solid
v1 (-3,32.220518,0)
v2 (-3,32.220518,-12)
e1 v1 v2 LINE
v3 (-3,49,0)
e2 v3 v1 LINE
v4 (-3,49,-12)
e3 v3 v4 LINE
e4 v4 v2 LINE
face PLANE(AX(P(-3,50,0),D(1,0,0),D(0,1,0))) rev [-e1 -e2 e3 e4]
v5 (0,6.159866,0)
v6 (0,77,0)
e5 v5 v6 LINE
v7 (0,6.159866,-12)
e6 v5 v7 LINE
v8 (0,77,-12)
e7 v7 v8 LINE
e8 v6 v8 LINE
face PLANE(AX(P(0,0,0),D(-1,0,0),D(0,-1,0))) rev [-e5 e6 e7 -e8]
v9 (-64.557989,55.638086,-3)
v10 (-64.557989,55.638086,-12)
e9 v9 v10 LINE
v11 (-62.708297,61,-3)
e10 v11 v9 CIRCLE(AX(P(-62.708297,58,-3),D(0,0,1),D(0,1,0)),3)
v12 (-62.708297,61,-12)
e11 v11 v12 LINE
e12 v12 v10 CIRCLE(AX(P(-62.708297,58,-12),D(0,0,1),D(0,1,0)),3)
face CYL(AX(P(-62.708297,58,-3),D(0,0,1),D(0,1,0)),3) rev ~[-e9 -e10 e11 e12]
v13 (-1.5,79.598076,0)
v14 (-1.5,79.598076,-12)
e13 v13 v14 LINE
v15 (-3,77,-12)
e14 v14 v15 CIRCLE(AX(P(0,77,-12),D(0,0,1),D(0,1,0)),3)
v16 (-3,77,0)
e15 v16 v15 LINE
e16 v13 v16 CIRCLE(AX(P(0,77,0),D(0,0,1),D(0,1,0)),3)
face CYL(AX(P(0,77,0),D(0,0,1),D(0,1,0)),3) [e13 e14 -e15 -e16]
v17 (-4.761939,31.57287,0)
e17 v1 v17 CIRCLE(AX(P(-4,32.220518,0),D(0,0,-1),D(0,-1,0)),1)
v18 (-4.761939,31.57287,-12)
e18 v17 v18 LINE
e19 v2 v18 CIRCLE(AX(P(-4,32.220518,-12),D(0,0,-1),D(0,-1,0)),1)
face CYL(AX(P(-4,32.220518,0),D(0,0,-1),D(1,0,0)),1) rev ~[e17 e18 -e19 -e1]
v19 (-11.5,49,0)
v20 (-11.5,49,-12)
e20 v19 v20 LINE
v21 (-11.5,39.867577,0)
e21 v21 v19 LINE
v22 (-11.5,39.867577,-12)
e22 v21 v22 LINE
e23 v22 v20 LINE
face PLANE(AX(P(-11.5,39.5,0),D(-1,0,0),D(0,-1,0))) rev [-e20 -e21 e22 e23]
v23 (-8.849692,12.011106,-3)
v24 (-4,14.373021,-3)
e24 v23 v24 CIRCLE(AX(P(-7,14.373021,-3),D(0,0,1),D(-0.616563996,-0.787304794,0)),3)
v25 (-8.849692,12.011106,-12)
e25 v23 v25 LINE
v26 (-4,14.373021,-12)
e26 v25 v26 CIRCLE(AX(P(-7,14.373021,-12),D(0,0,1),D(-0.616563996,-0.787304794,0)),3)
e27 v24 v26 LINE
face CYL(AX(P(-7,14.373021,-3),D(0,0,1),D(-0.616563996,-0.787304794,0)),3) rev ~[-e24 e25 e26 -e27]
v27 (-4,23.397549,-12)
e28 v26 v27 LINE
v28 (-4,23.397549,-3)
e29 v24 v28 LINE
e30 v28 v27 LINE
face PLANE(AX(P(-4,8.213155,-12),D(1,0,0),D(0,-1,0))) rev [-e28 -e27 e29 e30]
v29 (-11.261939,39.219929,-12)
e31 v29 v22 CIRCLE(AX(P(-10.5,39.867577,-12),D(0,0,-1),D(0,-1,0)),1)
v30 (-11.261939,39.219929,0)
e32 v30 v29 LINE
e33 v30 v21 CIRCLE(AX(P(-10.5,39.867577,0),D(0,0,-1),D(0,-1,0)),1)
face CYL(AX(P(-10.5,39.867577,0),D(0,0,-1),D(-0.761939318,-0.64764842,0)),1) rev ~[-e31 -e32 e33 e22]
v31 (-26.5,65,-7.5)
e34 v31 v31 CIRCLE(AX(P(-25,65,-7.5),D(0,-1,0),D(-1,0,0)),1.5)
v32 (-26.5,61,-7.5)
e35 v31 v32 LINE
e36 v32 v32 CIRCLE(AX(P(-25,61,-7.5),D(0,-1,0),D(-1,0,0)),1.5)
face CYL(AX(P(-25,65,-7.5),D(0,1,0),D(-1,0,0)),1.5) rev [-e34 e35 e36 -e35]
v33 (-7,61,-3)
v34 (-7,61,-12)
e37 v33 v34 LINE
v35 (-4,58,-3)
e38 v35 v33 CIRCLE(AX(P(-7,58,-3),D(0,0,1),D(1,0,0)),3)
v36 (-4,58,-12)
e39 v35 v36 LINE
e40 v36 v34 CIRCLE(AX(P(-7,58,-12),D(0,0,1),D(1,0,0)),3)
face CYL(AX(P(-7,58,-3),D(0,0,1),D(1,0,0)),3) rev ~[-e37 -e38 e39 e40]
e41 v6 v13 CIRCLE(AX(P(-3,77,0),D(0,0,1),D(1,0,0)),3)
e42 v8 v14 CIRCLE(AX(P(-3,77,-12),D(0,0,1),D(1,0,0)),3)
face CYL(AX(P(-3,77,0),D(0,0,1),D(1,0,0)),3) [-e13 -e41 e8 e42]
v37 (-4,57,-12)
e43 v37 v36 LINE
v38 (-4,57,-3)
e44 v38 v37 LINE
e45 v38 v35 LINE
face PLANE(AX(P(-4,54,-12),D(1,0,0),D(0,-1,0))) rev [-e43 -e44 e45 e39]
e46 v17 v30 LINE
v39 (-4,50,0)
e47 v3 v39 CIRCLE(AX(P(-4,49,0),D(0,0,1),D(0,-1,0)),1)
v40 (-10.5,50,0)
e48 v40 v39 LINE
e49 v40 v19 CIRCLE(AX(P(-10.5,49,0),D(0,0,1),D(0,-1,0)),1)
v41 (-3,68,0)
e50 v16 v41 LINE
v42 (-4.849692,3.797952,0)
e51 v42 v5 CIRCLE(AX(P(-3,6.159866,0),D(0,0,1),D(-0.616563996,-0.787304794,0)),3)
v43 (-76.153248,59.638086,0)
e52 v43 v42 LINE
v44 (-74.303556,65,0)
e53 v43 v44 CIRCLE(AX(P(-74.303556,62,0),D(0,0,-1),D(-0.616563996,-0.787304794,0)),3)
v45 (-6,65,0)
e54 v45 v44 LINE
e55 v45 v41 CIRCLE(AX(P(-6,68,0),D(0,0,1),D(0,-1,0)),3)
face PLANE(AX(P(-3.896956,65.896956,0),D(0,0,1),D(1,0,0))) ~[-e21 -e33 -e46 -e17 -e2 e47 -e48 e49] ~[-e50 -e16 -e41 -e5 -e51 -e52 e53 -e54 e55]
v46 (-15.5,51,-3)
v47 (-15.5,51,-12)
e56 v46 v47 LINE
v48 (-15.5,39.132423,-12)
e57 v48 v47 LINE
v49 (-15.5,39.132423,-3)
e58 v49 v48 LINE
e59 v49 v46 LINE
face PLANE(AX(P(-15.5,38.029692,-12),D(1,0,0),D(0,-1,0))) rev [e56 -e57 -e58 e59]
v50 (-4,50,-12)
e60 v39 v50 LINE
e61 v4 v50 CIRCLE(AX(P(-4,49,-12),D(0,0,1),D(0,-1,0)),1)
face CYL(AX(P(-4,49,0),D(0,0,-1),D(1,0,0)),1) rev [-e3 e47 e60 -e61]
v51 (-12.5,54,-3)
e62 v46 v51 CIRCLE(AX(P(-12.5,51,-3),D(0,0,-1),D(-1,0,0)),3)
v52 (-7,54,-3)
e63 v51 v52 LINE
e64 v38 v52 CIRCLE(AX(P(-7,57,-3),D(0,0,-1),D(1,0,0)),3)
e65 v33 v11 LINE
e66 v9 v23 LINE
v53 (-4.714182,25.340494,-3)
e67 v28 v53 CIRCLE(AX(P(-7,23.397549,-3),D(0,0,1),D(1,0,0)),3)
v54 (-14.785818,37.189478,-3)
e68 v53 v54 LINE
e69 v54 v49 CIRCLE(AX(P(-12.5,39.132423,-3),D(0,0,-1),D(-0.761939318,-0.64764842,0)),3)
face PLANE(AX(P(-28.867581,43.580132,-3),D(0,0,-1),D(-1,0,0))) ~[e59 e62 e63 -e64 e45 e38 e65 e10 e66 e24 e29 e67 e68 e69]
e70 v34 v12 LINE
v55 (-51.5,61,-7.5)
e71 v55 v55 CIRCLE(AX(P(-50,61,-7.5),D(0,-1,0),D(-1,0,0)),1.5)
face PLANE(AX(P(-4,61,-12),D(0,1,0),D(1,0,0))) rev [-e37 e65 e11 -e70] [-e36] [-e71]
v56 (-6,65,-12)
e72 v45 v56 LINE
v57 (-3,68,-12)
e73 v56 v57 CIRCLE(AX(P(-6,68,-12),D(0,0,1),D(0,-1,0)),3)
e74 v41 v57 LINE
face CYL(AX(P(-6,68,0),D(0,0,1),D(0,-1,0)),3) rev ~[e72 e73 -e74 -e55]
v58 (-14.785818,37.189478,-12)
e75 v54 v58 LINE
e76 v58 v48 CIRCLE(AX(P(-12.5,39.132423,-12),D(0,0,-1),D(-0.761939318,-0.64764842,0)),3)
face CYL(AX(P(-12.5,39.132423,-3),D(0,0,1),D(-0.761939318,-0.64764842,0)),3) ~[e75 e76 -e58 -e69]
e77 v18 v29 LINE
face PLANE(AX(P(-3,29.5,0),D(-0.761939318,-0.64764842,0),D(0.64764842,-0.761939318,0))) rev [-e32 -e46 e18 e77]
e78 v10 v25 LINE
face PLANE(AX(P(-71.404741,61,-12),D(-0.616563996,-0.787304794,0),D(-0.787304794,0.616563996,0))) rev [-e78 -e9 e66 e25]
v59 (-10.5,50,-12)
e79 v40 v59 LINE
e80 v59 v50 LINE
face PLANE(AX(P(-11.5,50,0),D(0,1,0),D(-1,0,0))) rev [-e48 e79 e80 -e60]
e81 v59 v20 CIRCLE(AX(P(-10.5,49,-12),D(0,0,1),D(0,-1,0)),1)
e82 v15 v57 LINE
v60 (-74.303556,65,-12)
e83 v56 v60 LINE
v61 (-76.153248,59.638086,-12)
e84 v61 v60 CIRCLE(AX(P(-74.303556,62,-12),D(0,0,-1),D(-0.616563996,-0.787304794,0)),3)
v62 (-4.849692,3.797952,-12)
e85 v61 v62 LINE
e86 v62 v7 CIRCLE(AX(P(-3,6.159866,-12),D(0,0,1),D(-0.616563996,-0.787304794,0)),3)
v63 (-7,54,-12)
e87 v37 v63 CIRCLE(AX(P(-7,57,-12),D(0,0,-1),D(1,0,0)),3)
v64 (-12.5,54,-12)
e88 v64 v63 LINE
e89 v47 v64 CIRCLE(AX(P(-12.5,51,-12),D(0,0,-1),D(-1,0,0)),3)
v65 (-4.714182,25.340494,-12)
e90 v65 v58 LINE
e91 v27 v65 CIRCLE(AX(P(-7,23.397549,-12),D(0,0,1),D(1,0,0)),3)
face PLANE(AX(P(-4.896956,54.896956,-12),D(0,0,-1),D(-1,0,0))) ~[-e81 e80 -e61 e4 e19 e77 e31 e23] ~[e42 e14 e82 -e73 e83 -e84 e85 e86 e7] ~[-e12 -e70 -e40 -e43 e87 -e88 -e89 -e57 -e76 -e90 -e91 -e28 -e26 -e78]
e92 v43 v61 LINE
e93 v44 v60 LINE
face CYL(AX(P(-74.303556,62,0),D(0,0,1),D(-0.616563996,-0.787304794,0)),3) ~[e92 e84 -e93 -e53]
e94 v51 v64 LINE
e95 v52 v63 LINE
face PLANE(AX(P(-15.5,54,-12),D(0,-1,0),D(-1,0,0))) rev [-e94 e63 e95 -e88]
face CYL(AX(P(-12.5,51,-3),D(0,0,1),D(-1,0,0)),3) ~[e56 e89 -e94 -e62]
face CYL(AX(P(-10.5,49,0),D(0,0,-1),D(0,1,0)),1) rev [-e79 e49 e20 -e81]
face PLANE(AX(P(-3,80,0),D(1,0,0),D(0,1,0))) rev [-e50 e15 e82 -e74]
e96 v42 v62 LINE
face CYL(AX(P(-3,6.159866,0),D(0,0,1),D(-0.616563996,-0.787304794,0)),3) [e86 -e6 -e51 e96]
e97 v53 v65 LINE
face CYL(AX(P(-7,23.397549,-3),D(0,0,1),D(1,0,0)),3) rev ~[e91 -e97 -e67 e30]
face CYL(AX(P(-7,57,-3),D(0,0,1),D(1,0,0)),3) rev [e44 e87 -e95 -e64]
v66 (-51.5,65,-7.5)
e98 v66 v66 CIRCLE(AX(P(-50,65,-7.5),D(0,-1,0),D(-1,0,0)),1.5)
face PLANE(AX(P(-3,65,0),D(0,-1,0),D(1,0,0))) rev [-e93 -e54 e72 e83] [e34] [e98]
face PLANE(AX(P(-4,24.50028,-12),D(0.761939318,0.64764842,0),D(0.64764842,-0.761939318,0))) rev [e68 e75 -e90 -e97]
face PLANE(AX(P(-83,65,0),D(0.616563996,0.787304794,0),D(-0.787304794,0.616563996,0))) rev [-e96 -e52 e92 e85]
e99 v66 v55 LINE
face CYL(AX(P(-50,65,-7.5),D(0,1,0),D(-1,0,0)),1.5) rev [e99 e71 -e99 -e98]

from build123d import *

# Parameters (mm, degrees)
F1_DEPTH    = 12
F3_DEPTH    = 9
F4_R        = 1.5
F5_DEPTH    = 4
F6_T1_DEPTH = 12
F6_T3_DEPTH = 9
F6_T5_DEPTH = 9
F6_T7_DEPTH = 12
F7_R        = 1


# Not quite as in the source:
# - a fillet or chamfer that OpenCascade refuses, or shapes differently, is made with other operations: its cross-section is extruded or revolved along the edge and cut away or added


with BuildPart() as f1:
    # F0 (on Top) → F1 (new body)
    with BuildSketch(Plane.XY):
        Polygon((-83, 65), (0, 0), (0, 80), (-3, 80), (-3, 65), align=None)
        Polygon((-11.5, 50), (-3, 50), (-3, 29.5), (-11.5, 39.5), align=None, mode=Mode.SUBTRACT)
    extrude(amount=F1_DEPTH)

    # F2 (on face) → F3 (cut)
    with BuildSketch(Plane.XY.offset(12)):
        Polygon((-4, 54), (-4, 61), (-71.4047410676, 61), (-4, 8.2131545856), (-4, 24.5002801184), (-15.5, 38.0296918831), (-15.5, 54), align=None)
    extrude(amount=-F3_DEPTH, mode=Mode.SUBTRACT)

    # F4 (on face) → F5 (cut)
    with BuildSketch(Plane(origin=(0, 65, 0), x_dir=(-1, 0, 0), z_dir=(0, 1, 0))):
        with Locations((50, 7.5)):
            Circle(F4_R)
        with Locations((25, 7.5)):
            Circle(F4_R)
    extrude(amount=-F5_DEPTH, mode=Mode.SUBTRACT)

    # F6: fillet of radius 3 on 12 edges, made by hand

    # F6_s2 → F6_t1 (join)
    with BuildSketch(Plane.XY):
        with BuildLine():
            ThreePointArc((-6, 65), (-3.8786796564, 65.8786796564), (-3, 68))
            Line((-3, 68), (-2.94, 68))
            Line((-2.94, 68), (-2.94, 64.94))
            Line((-2.94, 64.94), (-6, 64.94))
            Line((-6, 64.94), (-6, 65))
        make_face()
    extrude(amount=F6_T1_DEPTH)

    # F6_s4 → F6_t3 (join)
    with BuildSketch(Plane.XY.offset(3)):
        with BuildLine():
            ThreePointArc((-4, 57), (-4.8786796564, 54.8786796564), (-7, 54))
            Line((-7, 54), (-7, 53.94))
            Line((-7, 53.94), (-3.94, 53.94))
            Line((-3.94, 53.94), (-3.94, 57))
            Line((-3.94, 57), (-4, 57))
        make_face()
        with BuildLine():
            ThreePointArc((-4, 58), (-4.8786796564, 60.1213203436), (-7, 61))
            Line((-7, 61), (-7, 61.06))
            Line((-7, 61.06), (-3.94, 61.06))
            Line((-3.94, 61.06), (-3.94, 58))
            Line((-3.94, 58), (-4, 58))
        make_face()
        with BuildLine():
            ThreePointArc((-4, 23.3975490307), (-4.1842004812, 24.4325722527), (-4.7141820467, 25.340494291))
            Line((-4.7141820467, 25.340494291), (-4.6684656877, 25.3793531962))
            Line((-4.6684656877, 25.3793531962), (-3.94, 24.5223347402))
            Line((-3.94, 24.5223347402), (-3.94, 23.3975490307))
            Line((-3.94, 23.3975490307), (-4, 23.3975490307))
        make_face()
        with BuildLine():
            ThreePointArc((-8.8496919869, 12.0111061416), (-5.6864315702, 11.6758853817), (-4, 14.3730205248))
            Line((-4, 14.3730205248), (-3.94, 14.3730205248))
            Line((-3.94, 14.3730205248), (-3.94, 8.2131545856))
            Line((-3.94, 8.2131545856), (-4.0369938397, 8.165916298))
            Line((-4.0369938397, 8.165916298), (-8.8866858266, 11.9638678539))
            Line((-8.8866858266, 11.9638678539), (-8.8496919869, 12.0111061416))
        make_face()
        with BuildLine():
            ThreePointArc((-62.7082968683, 61), (-65.544292562, 58.9783294052), (-64.5579888552, 55.6380856168))
            Line((-64.5579888552, 55.6380856168), (-64.5949826949, 55.5908473291))
            Line((-64.5949826949, 55.5908473291), (-71.4417349073, 60.9527617123))
            Line((-71.4417349073, 60.9527617123), (-71.4047410676, 61.06))
            Line((-71.4047410676, 61.06), (-62.7082968683, 61.06))
            Line((-62.7082968683, 61.06), (-62.7082968683, 61))
        make_face()
    extrude(amount=F6_T3_DEPTH)

    # F6_s6 → F6_t5 (cut)
    with BuildSketch(Plane.XY.offset(3)):
        with BuildLine():
            ThreePointArc((-15.5, 51), (-14.6213203436, 53.1213203436), (-12.5, 54))
            Line((-12.5, 54), (-12.5, 54.06))
            Line((-12.5, 54.06), (-15.56, 54.06))
            Line((-15.56, 54.06), (-15.56, 51))
            Line((-15.56, 51), (-15.5, 51))
        make_face()
        with BuildLine():
            ThreePointArc((-14.7858179533, 37.1894777105), (-15.3157995188, 38.0973997488), (-15.5, 39.1324229708))
            Line((-15.5, 39.1324229708), (-15.56, 39.1324229708))
            Line((-15.56, 39.1324229708), (-15.56, 38.0076372613))
            Line((-15.56, 38.0076372613), (-14.8315343123, 37.1506188053))
            Line((-14.8315343123, 37.1506188053), (-14.7858179533, 37.1894777105))
        make_face()
    extrude(amount=F6_T5_DEPTH, mode=Mode.SUBTRACT)

    # F6_s8 → F6_t7 (cut)
    with BuildSketch(Plane.XY):
        with BuildLine():
            ThreePointArc((-76.1532477876, 59.6380856168), (-77.1395514944, 62.9783294052), (-74.3035558007, 65))
            Line((-74.3035558007, 65), (-74.3035558007, 65.06))
            Line((-74.3035558007, 65.06), (-83, 65.06))
            Line((-83, 65.06), (-83.0369938397, 64.9527617123))
            Line((-83.0369938397, 64.9527617123), (-76.1902416273, 59.5908473291))
            Line((-76.1902416273, 59.5908473291), (-76.1532477876, 59.6380856168))
        make_face()
        with BuildLine():
            ThreePointArc((0, 80), (-2.1213203436, 79.1213203436), (-3, 77))
            Line((-3, 77), (-3.06, 77))
            Line((-3.06, 77), (-3.06, 80.06))
            Line((-3.06, 80.06), (0, 80.06))
            Line((0, 80.06), (0, 80))
        make_face()
        with BuildLine():
            ThreePointArc((-4.8496919869, 3.797951556), (-1.6864315702, 3.4627307961), (0, 6.1598659392))
            Line((0, 6.1598659392), (0.06, 6.1598659392))
            Line((0.06, 6.1598659392), (0.06, 0))
            Line((0.06, 0), (-0.0369938397, -0.0472382877))
            Line((-0.0369938397, -0.0472382877), (-4.8866858266, 3.7507132683))
            Line((-4.8866858266, 3.7507132683), (-4.8496919869, 3.797951556))
        make_face()
        with BuildLine():
            ThreePointArc((0, 77), (-0.8786796564, 79.1213203436), (-3, 80))
            Line((-3, 80), (-3, 80.06))
            Line((-3, 80.06), (0.06, 80.06))
            Line((0.06, 80.06), (0.06, 77))
            Line((0.06, 77), (0, 77))
        make_face()
    extrude(amount=F6_T7_DEPTH, mode=Mode.SUBTRACT)

    # F7
    f7_edges = [f1.edges().sort_by_distance(p)[0] for p in [
        (-11.5, 50, 6),
        (-3, 50, 6),
        (-11.5, 39.5, 6),
        (-3, 29.5, 6),
    ]]
    fillet(f7_edges, radius=F7_R)


with BuildPart() as f8_1:
    # F8: instance of F1
    add(f1.part.mirror(Plane.XY))


solid = f8_1.part
